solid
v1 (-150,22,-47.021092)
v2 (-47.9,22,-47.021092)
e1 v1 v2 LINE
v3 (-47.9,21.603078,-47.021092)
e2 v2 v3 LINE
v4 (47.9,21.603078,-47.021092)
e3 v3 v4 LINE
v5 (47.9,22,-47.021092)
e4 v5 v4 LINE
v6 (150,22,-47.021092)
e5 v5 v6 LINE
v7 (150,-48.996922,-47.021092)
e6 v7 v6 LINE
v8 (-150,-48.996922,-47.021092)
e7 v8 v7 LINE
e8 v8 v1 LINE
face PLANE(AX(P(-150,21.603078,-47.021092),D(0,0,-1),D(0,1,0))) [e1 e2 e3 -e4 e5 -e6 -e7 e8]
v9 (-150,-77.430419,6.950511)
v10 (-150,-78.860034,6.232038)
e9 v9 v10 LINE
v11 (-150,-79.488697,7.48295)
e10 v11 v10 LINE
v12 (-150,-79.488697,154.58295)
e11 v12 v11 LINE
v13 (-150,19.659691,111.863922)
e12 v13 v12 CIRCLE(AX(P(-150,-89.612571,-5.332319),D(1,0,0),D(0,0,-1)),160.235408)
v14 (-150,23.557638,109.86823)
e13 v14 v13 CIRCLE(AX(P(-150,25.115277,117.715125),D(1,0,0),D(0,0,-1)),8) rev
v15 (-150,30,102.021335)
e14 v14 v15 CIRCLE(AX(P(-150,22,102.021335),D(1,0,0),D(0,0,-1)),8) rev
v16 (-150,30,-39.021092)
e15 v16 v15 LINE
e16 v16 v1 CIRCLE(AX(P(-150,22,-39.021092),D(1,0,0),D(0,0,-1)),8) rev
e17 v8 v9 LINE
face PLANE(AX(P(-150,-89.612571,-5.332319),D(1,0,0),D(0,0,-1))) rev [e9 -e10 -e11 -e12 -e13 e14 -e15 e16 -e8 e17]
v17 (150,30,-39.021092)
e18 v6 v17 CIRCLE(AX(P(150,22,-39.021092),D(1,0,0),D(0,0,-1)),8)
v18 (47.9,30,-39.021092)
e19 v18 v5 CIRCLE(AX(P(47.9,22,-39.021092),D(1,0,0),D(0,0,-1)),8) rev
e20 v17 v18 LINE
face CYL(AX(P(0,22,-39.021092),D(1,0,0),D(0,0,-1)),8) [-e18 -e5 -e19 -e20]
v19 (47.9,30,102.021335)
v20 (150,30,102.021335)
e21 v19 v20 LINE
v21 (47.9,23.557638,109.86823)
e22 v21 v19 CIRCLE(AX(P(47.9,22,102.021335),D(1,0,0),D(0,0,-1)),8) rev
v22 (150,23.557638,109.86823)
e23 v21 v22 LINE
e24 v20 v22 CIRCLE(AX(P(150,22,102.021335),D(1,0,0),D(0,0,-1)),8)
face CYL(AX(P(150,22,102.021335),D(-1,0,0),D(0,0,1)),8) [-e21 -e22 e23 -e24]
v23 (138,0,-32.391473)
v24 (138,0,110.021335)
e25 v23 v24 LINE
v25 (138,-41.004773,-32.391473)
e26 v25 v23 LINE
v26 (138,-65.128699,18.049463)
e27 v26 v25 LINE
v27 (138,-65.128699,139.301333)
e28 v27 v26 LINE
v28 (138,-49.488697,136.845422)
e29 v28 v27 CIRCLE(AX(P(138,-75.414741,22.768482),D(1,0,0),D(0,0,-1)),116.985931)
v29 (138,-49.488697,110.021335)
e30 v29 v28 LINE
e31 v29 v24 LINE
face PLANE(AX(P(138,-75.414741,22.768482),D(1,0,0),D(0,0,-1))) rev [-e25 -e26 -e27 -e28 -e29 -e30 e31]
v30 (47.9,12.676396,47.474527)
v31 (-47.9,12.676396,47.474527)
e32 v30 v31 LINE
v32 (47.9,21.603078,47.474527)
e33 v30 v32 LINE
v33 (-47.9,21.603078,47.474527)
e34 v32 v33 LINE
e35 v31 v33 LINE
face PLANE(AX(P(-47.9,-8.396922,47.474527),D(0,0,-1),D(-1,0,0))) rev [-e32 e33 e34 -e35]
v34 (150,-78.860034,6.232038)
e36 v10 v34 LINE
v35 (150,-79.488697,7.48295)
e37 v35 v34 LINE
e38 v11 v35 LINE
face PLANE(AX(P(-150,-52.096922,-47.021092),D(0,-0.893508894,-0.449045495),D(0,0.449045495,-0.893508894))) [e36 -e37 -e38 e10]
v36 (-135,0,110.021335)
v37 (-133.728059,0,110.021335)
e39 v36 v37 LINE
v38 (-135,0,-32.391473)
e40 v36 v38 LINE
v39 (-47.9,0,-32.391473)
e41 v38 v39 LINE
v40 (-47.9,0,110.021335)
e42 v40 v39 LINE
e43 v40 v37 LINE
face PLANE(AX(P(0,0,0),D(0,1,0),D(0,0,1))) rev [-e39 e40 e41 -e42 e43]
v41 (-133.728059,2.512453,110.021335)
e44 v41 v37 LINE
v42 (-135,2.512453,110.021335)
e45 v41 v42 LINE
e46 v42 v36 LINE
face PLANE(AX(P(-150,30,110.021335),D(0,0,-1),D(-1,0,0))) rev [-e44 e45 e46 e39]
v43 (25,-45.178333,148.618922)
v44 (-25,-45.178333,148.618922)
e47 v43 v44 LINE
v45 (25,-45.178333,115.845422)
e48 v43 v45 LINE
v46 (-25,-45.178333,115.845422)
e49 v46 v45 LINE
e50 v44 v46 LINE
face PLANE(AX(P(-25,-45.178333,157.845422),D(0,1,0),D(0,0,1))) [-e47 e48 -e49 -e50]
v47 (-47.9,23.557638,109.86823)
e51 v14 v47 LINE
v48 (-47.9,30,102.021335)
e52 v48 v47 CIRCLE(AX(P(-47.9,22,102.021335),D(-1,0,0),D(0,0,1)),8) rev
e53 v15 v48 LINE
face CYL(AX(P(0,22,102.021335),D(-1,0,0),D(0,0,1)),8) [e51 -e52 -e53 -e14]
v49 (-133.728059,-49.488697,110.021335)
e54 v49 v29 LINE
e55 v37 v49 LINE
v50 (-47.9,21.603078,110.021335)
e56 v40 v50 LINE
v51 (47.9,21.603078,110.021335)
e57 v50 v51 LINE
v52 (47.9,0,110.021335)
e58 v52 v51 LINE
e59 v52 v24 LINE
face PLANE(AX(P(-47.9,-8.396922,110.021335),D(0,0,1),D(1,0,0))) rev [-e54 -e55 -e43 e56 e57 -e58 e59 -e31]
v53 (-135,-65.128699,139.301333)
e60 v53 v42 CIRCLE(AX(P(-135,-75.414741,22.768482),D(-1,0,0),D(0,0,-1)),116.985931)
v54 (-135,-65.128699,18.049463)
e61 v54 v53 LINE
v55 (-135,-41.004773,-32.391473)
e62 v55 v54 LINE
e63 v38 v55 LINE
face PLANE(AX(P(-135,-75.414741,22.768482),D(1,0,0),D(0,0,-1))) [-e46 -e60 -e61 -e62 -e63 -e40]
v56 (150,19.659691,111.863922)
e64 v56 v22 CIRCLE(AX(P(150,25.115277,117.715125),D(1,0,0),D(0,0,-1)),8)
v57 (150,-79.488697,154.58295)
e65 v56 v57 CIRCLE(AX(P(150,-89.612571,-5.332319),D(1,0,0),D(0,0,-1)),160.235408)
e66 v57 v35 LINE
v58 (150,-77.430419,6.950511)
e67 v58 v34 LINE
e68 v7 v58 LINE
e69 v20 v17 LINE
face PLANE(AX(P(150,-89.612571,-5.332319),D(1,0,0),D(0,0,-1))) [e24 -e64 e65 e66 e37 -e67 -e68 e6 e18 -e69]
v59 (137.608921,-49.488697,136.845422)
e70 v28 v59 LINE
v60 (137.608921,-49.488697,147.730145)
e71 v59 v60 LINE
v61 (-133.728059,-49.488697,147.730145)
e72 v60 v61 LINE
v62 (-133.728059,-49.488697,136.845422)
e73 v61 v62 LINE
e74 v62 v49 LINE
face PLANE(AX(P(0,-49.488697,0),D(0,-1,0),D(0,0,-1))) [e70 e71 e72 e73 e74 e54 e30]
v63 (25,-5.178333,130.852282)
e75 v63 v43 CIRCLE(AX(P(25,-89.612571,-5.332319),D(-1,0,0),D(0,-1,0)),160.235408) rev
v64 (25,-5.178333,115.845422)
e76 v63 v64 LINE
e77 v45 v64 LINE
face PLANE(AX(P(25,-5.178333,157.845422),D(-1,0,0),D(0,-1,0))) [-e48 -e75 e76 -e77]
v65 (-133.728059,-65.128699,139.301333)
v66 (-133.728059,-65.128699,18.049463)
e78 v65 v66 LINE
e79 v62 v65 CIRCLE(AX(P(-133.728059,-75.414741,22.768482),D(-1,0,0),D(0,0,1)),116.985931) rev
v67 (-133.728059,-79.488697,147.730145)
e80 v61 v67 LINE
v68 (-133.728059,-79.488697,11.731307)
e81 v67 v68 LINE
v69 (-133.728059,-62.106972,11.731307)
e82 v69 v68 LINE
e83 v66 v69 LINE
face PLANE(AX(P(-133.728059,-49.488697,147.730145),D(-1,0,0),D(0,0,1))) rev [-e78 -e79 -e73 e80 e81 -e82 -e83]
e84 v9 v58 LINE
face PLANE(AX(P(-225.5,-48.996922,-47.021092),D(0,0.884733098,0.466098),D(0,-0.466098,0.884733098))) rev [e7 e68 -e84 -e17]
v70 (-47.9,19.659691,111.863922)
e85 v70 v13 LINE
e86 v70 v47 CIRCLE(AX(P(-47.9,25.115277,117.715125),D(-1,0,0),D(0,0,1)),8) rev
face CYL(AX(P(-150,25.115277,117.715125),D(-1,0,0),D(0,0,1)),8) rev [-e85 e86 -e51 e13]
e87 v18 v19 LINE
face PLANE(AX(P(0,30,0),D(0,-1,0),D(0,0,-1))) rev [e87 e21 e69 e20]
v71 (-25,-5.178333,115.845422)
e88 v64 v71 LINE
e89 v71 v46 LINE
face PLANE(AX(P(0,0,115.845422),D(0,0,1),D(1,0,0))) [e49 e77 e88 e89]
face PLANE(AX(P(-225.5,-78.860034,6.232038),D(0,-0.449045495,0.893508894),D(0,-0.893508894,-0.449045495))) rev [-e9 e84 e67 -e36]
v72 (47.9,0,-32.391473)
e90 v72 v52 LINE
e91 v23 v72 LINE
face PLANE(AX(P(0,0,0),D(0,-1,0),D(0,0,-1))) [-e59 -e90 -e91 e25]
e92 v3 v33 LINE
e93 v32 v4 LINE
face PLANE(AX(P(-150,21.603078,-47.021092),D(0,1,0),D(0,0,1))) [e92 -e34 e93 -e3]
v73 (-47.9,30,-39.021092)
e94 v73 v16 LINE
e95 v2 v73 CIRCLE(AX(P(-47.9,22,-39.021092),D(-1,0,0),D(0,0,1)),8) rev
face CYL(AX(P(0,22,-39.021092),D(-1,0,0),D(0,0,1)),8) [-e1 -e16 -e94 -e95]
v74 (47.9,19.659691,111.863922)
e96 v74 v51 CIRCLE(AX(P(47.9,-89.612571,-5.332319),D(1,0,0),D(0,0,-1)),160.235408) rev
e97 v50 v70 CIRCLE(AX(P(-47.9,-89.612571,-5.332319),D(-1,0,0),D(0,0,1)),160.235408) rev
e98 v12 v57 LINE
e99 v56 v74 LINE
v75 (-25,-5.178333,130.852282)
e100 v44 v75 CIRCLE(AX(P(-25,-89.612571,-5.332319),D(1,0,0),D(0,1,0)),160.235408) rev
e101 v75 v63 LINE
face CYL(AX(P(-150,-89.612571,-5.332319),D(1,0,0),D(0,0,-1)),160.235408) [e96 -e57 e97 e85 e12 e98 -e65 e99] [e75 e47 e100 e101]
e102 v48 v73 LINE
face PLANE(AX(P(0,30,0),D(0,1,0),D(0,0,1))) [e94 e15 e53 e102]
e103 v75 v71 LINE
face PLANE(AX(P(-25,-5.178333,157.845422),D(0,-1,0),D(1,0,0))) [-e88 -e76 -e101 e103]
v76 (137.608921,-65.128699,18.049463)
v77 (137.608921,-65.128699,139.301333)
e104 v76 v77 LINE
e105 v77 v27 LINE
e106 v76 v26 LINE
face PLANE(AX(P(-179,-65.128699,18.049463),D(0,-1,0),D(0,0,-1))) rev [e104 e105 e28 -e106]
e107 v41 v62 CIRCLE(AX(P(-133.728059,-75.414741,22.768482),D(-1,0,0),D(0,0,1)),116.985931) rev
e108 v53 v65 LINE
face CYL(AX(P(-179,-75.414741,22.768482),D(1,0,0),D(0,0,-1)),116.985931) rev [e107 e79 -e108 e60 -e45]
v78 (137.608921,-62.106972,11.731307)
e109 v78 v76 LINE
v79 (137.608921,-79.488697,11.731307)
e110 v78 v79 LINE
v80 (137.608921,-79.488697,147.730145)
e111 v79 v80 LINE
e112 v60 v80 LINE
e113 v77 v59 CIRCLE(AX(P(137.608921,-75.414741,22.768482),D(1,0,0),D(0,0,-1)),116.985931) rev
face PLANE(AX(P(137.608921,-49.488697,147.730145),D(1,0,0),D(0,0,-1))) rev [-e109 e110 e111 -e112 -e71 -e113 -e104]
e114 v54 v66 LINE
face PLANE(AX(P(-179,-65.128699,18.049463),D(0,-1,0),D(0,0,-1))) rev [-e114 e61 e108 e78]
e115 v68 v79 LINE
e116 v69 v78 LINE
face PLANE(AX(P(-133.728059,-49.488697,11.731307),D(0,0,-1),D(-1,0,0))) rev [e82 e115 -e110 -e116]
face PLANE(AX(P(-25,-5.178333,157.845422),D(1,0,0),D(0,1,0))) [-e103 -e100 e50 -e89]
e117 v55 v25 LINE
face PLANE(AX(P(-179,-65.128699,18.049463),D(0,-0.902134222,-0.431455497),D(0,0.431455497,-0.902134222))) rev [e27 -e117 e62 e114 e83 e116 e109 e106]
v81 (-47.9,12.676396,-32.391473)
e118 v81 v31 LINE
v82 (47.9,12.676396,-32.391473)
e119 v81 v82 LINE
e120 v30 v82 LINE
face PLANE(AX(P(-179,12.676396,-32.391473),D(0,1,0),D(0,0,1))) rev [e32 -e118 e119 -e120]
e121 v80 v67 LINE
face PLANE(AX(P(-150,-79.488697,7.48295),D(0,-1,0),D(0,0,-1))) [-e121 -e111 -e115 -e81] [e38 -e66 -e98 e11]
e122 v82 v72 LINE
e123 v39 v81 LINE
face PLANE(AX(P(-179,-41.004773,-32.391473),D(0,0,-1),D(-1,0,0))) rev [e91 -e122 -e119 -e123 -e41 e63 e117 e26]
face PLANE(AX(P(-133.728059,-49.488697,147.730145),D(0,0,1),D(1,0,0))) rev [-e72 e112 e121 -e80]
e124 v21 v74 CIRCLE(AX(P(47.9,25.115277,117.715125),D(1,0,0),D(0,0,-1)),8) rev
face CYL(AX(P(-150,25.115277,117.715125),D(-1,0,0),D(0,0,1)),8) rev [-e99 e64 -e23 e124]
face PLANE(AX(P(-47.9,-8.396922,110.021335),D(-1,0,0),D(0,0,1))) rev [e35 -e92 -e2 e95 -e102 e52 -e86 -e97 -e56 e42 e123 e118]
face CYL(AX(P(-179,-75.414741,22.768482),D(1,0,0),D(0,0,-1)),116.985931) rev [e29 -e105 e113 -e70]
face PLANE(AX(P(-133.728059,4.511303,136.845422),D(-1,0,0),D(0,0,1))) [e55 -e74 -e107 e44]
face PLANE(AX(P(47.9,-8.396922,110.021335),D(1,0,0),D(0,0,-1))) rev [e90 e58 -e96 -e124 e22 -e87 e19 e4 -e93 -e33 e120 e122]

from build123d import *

# Parameters (mm, degrees)
BOSS_EXTRUDE1_DEPTH      = 150
BOSS_EXTRUDE1_DEPTH_BACK = 150
CUT_EXTRUDE3_DEPTH       = 375.5
CUT_EXTRUDE6_DEPTH       = 329
SKETCH9_W                = 271.336979698
SKETCH9_H                = 135.998838498
CUT_EXTRUDE9_DEPTH       = 30
SKETCH10_W               = 95.8
SKETCH10_H               = 62.546807737
CUT_EXTRUDE11_DEPTH      = 30
SKETCH11_W               = 102.1
SKETCH11_H               = 157.042427203
BOSS_EXTRUDE2_DEPTH      = 30
FILLET4_R                = 8
FILLET5_R                = 8
FILLET6_R                = 8
FILLET7_R                = 8
FILLET8_R                = 8
FILLET9_R                = 8
BOSS_EXTRUDE3_DEPTH      = 12
BOSS_EXTRUDE4_START      = -15
BOSS_EXTRUDE4_DEPTH      = 15
SKETCH17_W               = 271.728058528
SKETCH17_H               = 26.824087215
BOSS_EXTRUDE5_DEPTH      = 54
CUT_EXTRUDE14_DEPTH      = 21
CUT_EXTRUDE14_DEPTH_BACK = 21
SKETCH18_W               = 50
SKETCH18_H               = 40
CUT_EXTRUDE15_START      = -349
CUT_EXTRUDE15_DEPTH      = 349


with BuildPart() as part:
    # Sketch2 → Boss-Extrude1 (new, two sides: drawn at the far end of the back side and taken through both)
    with BuildSketch(Plane(origin=(0, 0, 0), x_dir=(0, 0, -1), z_dir=(1, 0, 0)).offset(-BOSS_EXTRUDE1_DEPTH_BACK)):
        with BuildLine():
            Line((47.021092325, 21.603077895), (47.021092325, -52.096922105))
            Line((47.021092325, -52.096922105), (-7.482950192, -79.488697318))
            Line((-7.482950192, -79.488697318), (-154.582950192, -79.488697318))
            ThreePointArc((-154.582950192, -79.488697318), (-141.2900932, -24.98088898), (-110.021334878, 21.603077895))
            Line((-110.021334878, 21.603077895), (47.021092325, 21.603077895))
        make_face()
    extrude(amount=BOSS_EXTRUDE1_DEPTH + BOSS_EXTRUDE1_DEPTH_BACK)

    # Sketch6 → Cut-Extrude3 (cut)
    with BuildSketch(Plane(origin=(150, 0, 0), x_dir=(0, 0, -1), z_dir=(1, 0, 0))):
        Polygon((47.021092325, -52.096922105), (47.021092325, -48.996922105), (-6.950510533, -77.430419395), (-6.23203774, -78.860033625), align=None)
    extrude(amount=-CUT_EXTRUDE3_DEPTH, mode=Mode.SUBTRACT)

    # Sketch8 → Cut-Extrude6 (cut)
    with BuildSketch(Plane(origin=(150, 0, 0), x_dir=(0, 0, -1), z_dir=(1, 0, 0))):
        with BuildLine():
            Line((-18.049462918, -65.128698573), (-139.30133294, -65.128698573))
            ThreePointArc((-139.30133294, -65.128698573), (-127.051990379, -22.399103161), (-99.746787758, 12.676395797))
            Line((-99.746787758, 12.676395797), (32.391473071, 12.676395797))
            Line((32.391473071, 12.676395797), (32.391473071, -41.004772665))
            Line((32.391473071, -41.004772665), (-18.049462918, -65.128698573))
        make_face()
    extrude(amount=-CUT_EXTRUDE6_DEPTH, mode=Mode.SUBTRACT)

    # Sketch9 → Cut-Extrude9 (cut)
    with BuildSketch(Plane.XZ.offset(79.488697318)):
        with Locations((1.940431321, 79.730726135)):
            Rectangle(SKETCH9_W, SKETCH9_H)
    extrude(amount=-CUT_EXTRUDE9_DEPTH, mode=Mode.SUBTRACT)

    # Sketch10 → Cut-Extrude11 (cut)
    with BuildSketch(Plane(origin=(0, 21.603077895, 0), x_dir=(1, 0, 0), z_dir=(0, 1, 0))):
        with Locations((0, -78.74793101)):
            Rectangle(SKETCH10_W, SKETCH10_H)
    extrude(amount=-CUT_EXTRUDE11_DEPTH, mode=Mode.SUBTRACT)

    # Sketch11 → Boss-Extrude2 (add)
    with BuildSketch(Plane(origin=(0, 0, 0), x_dir=(1, 0, 0), z_dir=(0, 1, 0))):
        with Locations((-98.95, -31.500121276)):
            Rectangle(SKETCH11_W, SKETCH11_H)
        with Locations((98.95, -31.500121276)):
            Rectangle(SKETCH11_W, SKETCH11_H)
    extrude(amount=BOSS_EXTRUDE2_DEPTH)

    # Fillet4
    fillet4_edges = [part.edges().sort_by_distance(p)[0] for p in [
        (-98.95, 30, 110.021334878),
    ]]
    fillet(fillet4_edges, radius=FILLET4_R)

    # Fillet5
    fillet5_edges = [part.edges().sort_by_distance(p)[0] for p in [
        (98.95, 30, 110.021334878),
    ]]
    fillet(fillet5_edges, radius=FILLET5_R)

    # Fillet6
    # the kernel refuses this fillet: 8 mm, written as the material it adds along each edge
    with BuildSketch(Plane(origin=(-150, 21.603077895, 110.021334878), x_dir=(0, -0.7256761067447404, 0.6880364729429655), z_dir=(1, 0, 0))) as fillet6_piece_1:
        with BuildLine():
            CenterArc((2.744889422, -7.999720666), FILLET6_R, 90.478801773, 31.768597775)
            Line((-1.523719625, -1.233704348), (-1.950580529, -0.557102717))
            ThreePointArc((-1.950580529, -0.557102717), (-0.838466066, 0.307444001), (-0.550429178, 0.580540885))
            Line((-0.550429178, 0.580540885), (0.006685256, 0.799972067))
            ThreePointArc((0.006685256, 0.799972067), (1.33901843, 0.794405102), (2.671351604, 0.799972067))
            Line((2.671351604, 0.799972067), (2.67803686, 0))
        make_face()
    extrude(amount=102.1)
    # the kernel refuses this fillet: 8 mm, written as the material it takes off along each edge

    # Fillet7
    # the kernel refuses this fillet: 8 mm, written as the material it adds along each edge
    with BuildSketch(Plane(origin=(47.9, 21.603077895, 110.021334878), x_dir=(0, 0.9969460846976341, -0.07809292033249748), z_dir=(1, 0, 0))) as fillet7_piece_1:
        with BuildLine():
            CenterArc((2.900642421, 7.944571871), FILLET7_R, 231.482877932, 31.768597775)
            Line((-2.081345425, 1.685195137), (-2.579544209, 1.059257463))
            ThreePointArc((-2.579544209, 1.059257463), (-1.540564119, 0.225193287), (-0.508590223, -0.617524077))
            Line((-0.508590223, -0.617524077), (0.062474336, -0.797556868))
            ThreePointArc((0.062474336, -0.797556868), (0.458184274, -0.766560061), (1.866538405, -0.794457187))
            Line((1.866538405, -0.794457187), (1.960547861, 0))
        make_face()
    extrude(amount=102.1)
    # the kernel refuses this fillet: 8 mm, written as the material it takes off along each edge

    # Fillet8
    fillet8_edges = [part.edges().sort_by_distance(p)[0] for p in [
        (98.95, 30, -47.021092325),
    ]]
    fillet(fillet8_edges, radius=FILLET8_R)

    # Fillet9
    fillet9_edges = [part.edges().sort_by_distance(p)[0] for p in [
        (-98.95, 30, -47.021092325),
    ]]
    fillet(fillet9_edges, radius=FILLET9_R)

    # Sketch13 → Boss-Extrude3 (add)
    with BuildSketch(Plane(origin=(150, 0, 0), x_dir=(0, 0, -1), z_dir=(1, 0, 0))):
        with BuildLine():
            Line((-139.30133294, -65.128698573), (-18.049462918, -65.128698573))
            Line((-18.049462918, -65.128698573), (32.391473071, -41.004772665))
            Line((32.391473071, -41.004772665), (32.391473071, 0))
            Line((32.391473071, 0), (-110.021334878, 0))
            Line((-110.021334878, 0), (-110.021334878, 2.512453321))
            ThreePointArc((-110.021334878, 2.512453321), (-130.12762054, -28.941917181), (-139.30133294, -65.128698573))
        make_face()
    extrude(amount=-BOSS_EXTRUDE3_DEPTH)

    # Sketch15 → Boss-Extrude4 (add)
    with BuildSketch(Plane.ZY.offset(150).offset(BOSS_EXTRUDE4_START)):
        with BuildLine():
            Line((-32.391473071, 0), (-32.391473071, -41.004772665))
            Line((-32.391473071, -41.004772665), (18.049462918, -65.128698573))
            Line((18.049462918, -65.128698573), (139.30133294, -65.128698573))
            ThreePointArc((139.30133294, -65.128698573), (130.12762054, -28.941917181), (110.021334878, 2.512453321))
            Line((110.021334878, 2.512453321), (110.021334878, 0))
            Line((110.021334878, 0), (-32.391473071, 0))
        make_face()
    extrude(amount=BOSS_EXTRUDE4_DEPTH)

    # Sketch17 → Boss-Extrude5 (add)
    with BuildSketch(Plane.XZ.offset(49.488697318)):
        with Locations((2.135970736, 123.433378486)):
            Rectangle(SKETCH17_W, SKETCH17_H)
    extrude(amount=-BOSS_EXTRUDE5_DEPTH)

    # Sketch18 → Cut-Extrude14 (cut, two sides: drawn at the far end of the back side and taken through both)
    with BuildSketch(Plane.XY.offset(136.845422093).offset(-CUT_EXTRUDE14_DEPTH_BACK)):
        with Locations((0, -25.17833284)):
            Rectangle(SKETCH18_W, SKETCH18_H)
    extrude(amount=CUT_EXTRUDE14_DEPTH + CUT_EXTRUDE14_DEPTH_BACK, mode=Mode.SUBTRACT)

    # Sketch20 → Cut-Extrude15 (cut)
    with BuildSketch(Plane(origin=(150, 0, 0), x_dir=(0, 0, -1), z_dir=(1, 0, 0)).offset(CUT_EXTRUDE15_START)):
        with BuildLine():
            Line((-136.845422093, 4.511302682), (-124.344519516, 4.511302682))
            ThreePointArc((-124.344519516, 4.511302682), (-130.970660544, -5.3695664), (-136.845422093, -15.714830799))
            Line((-136.845422093, -15.714830799), (-136.845422093, 4.511302682))
        make_face()
    extrude(amount=CUT_EXTRUDE15_DEPTH, mode=Mode.SUBTRACT)


solid = part.part
